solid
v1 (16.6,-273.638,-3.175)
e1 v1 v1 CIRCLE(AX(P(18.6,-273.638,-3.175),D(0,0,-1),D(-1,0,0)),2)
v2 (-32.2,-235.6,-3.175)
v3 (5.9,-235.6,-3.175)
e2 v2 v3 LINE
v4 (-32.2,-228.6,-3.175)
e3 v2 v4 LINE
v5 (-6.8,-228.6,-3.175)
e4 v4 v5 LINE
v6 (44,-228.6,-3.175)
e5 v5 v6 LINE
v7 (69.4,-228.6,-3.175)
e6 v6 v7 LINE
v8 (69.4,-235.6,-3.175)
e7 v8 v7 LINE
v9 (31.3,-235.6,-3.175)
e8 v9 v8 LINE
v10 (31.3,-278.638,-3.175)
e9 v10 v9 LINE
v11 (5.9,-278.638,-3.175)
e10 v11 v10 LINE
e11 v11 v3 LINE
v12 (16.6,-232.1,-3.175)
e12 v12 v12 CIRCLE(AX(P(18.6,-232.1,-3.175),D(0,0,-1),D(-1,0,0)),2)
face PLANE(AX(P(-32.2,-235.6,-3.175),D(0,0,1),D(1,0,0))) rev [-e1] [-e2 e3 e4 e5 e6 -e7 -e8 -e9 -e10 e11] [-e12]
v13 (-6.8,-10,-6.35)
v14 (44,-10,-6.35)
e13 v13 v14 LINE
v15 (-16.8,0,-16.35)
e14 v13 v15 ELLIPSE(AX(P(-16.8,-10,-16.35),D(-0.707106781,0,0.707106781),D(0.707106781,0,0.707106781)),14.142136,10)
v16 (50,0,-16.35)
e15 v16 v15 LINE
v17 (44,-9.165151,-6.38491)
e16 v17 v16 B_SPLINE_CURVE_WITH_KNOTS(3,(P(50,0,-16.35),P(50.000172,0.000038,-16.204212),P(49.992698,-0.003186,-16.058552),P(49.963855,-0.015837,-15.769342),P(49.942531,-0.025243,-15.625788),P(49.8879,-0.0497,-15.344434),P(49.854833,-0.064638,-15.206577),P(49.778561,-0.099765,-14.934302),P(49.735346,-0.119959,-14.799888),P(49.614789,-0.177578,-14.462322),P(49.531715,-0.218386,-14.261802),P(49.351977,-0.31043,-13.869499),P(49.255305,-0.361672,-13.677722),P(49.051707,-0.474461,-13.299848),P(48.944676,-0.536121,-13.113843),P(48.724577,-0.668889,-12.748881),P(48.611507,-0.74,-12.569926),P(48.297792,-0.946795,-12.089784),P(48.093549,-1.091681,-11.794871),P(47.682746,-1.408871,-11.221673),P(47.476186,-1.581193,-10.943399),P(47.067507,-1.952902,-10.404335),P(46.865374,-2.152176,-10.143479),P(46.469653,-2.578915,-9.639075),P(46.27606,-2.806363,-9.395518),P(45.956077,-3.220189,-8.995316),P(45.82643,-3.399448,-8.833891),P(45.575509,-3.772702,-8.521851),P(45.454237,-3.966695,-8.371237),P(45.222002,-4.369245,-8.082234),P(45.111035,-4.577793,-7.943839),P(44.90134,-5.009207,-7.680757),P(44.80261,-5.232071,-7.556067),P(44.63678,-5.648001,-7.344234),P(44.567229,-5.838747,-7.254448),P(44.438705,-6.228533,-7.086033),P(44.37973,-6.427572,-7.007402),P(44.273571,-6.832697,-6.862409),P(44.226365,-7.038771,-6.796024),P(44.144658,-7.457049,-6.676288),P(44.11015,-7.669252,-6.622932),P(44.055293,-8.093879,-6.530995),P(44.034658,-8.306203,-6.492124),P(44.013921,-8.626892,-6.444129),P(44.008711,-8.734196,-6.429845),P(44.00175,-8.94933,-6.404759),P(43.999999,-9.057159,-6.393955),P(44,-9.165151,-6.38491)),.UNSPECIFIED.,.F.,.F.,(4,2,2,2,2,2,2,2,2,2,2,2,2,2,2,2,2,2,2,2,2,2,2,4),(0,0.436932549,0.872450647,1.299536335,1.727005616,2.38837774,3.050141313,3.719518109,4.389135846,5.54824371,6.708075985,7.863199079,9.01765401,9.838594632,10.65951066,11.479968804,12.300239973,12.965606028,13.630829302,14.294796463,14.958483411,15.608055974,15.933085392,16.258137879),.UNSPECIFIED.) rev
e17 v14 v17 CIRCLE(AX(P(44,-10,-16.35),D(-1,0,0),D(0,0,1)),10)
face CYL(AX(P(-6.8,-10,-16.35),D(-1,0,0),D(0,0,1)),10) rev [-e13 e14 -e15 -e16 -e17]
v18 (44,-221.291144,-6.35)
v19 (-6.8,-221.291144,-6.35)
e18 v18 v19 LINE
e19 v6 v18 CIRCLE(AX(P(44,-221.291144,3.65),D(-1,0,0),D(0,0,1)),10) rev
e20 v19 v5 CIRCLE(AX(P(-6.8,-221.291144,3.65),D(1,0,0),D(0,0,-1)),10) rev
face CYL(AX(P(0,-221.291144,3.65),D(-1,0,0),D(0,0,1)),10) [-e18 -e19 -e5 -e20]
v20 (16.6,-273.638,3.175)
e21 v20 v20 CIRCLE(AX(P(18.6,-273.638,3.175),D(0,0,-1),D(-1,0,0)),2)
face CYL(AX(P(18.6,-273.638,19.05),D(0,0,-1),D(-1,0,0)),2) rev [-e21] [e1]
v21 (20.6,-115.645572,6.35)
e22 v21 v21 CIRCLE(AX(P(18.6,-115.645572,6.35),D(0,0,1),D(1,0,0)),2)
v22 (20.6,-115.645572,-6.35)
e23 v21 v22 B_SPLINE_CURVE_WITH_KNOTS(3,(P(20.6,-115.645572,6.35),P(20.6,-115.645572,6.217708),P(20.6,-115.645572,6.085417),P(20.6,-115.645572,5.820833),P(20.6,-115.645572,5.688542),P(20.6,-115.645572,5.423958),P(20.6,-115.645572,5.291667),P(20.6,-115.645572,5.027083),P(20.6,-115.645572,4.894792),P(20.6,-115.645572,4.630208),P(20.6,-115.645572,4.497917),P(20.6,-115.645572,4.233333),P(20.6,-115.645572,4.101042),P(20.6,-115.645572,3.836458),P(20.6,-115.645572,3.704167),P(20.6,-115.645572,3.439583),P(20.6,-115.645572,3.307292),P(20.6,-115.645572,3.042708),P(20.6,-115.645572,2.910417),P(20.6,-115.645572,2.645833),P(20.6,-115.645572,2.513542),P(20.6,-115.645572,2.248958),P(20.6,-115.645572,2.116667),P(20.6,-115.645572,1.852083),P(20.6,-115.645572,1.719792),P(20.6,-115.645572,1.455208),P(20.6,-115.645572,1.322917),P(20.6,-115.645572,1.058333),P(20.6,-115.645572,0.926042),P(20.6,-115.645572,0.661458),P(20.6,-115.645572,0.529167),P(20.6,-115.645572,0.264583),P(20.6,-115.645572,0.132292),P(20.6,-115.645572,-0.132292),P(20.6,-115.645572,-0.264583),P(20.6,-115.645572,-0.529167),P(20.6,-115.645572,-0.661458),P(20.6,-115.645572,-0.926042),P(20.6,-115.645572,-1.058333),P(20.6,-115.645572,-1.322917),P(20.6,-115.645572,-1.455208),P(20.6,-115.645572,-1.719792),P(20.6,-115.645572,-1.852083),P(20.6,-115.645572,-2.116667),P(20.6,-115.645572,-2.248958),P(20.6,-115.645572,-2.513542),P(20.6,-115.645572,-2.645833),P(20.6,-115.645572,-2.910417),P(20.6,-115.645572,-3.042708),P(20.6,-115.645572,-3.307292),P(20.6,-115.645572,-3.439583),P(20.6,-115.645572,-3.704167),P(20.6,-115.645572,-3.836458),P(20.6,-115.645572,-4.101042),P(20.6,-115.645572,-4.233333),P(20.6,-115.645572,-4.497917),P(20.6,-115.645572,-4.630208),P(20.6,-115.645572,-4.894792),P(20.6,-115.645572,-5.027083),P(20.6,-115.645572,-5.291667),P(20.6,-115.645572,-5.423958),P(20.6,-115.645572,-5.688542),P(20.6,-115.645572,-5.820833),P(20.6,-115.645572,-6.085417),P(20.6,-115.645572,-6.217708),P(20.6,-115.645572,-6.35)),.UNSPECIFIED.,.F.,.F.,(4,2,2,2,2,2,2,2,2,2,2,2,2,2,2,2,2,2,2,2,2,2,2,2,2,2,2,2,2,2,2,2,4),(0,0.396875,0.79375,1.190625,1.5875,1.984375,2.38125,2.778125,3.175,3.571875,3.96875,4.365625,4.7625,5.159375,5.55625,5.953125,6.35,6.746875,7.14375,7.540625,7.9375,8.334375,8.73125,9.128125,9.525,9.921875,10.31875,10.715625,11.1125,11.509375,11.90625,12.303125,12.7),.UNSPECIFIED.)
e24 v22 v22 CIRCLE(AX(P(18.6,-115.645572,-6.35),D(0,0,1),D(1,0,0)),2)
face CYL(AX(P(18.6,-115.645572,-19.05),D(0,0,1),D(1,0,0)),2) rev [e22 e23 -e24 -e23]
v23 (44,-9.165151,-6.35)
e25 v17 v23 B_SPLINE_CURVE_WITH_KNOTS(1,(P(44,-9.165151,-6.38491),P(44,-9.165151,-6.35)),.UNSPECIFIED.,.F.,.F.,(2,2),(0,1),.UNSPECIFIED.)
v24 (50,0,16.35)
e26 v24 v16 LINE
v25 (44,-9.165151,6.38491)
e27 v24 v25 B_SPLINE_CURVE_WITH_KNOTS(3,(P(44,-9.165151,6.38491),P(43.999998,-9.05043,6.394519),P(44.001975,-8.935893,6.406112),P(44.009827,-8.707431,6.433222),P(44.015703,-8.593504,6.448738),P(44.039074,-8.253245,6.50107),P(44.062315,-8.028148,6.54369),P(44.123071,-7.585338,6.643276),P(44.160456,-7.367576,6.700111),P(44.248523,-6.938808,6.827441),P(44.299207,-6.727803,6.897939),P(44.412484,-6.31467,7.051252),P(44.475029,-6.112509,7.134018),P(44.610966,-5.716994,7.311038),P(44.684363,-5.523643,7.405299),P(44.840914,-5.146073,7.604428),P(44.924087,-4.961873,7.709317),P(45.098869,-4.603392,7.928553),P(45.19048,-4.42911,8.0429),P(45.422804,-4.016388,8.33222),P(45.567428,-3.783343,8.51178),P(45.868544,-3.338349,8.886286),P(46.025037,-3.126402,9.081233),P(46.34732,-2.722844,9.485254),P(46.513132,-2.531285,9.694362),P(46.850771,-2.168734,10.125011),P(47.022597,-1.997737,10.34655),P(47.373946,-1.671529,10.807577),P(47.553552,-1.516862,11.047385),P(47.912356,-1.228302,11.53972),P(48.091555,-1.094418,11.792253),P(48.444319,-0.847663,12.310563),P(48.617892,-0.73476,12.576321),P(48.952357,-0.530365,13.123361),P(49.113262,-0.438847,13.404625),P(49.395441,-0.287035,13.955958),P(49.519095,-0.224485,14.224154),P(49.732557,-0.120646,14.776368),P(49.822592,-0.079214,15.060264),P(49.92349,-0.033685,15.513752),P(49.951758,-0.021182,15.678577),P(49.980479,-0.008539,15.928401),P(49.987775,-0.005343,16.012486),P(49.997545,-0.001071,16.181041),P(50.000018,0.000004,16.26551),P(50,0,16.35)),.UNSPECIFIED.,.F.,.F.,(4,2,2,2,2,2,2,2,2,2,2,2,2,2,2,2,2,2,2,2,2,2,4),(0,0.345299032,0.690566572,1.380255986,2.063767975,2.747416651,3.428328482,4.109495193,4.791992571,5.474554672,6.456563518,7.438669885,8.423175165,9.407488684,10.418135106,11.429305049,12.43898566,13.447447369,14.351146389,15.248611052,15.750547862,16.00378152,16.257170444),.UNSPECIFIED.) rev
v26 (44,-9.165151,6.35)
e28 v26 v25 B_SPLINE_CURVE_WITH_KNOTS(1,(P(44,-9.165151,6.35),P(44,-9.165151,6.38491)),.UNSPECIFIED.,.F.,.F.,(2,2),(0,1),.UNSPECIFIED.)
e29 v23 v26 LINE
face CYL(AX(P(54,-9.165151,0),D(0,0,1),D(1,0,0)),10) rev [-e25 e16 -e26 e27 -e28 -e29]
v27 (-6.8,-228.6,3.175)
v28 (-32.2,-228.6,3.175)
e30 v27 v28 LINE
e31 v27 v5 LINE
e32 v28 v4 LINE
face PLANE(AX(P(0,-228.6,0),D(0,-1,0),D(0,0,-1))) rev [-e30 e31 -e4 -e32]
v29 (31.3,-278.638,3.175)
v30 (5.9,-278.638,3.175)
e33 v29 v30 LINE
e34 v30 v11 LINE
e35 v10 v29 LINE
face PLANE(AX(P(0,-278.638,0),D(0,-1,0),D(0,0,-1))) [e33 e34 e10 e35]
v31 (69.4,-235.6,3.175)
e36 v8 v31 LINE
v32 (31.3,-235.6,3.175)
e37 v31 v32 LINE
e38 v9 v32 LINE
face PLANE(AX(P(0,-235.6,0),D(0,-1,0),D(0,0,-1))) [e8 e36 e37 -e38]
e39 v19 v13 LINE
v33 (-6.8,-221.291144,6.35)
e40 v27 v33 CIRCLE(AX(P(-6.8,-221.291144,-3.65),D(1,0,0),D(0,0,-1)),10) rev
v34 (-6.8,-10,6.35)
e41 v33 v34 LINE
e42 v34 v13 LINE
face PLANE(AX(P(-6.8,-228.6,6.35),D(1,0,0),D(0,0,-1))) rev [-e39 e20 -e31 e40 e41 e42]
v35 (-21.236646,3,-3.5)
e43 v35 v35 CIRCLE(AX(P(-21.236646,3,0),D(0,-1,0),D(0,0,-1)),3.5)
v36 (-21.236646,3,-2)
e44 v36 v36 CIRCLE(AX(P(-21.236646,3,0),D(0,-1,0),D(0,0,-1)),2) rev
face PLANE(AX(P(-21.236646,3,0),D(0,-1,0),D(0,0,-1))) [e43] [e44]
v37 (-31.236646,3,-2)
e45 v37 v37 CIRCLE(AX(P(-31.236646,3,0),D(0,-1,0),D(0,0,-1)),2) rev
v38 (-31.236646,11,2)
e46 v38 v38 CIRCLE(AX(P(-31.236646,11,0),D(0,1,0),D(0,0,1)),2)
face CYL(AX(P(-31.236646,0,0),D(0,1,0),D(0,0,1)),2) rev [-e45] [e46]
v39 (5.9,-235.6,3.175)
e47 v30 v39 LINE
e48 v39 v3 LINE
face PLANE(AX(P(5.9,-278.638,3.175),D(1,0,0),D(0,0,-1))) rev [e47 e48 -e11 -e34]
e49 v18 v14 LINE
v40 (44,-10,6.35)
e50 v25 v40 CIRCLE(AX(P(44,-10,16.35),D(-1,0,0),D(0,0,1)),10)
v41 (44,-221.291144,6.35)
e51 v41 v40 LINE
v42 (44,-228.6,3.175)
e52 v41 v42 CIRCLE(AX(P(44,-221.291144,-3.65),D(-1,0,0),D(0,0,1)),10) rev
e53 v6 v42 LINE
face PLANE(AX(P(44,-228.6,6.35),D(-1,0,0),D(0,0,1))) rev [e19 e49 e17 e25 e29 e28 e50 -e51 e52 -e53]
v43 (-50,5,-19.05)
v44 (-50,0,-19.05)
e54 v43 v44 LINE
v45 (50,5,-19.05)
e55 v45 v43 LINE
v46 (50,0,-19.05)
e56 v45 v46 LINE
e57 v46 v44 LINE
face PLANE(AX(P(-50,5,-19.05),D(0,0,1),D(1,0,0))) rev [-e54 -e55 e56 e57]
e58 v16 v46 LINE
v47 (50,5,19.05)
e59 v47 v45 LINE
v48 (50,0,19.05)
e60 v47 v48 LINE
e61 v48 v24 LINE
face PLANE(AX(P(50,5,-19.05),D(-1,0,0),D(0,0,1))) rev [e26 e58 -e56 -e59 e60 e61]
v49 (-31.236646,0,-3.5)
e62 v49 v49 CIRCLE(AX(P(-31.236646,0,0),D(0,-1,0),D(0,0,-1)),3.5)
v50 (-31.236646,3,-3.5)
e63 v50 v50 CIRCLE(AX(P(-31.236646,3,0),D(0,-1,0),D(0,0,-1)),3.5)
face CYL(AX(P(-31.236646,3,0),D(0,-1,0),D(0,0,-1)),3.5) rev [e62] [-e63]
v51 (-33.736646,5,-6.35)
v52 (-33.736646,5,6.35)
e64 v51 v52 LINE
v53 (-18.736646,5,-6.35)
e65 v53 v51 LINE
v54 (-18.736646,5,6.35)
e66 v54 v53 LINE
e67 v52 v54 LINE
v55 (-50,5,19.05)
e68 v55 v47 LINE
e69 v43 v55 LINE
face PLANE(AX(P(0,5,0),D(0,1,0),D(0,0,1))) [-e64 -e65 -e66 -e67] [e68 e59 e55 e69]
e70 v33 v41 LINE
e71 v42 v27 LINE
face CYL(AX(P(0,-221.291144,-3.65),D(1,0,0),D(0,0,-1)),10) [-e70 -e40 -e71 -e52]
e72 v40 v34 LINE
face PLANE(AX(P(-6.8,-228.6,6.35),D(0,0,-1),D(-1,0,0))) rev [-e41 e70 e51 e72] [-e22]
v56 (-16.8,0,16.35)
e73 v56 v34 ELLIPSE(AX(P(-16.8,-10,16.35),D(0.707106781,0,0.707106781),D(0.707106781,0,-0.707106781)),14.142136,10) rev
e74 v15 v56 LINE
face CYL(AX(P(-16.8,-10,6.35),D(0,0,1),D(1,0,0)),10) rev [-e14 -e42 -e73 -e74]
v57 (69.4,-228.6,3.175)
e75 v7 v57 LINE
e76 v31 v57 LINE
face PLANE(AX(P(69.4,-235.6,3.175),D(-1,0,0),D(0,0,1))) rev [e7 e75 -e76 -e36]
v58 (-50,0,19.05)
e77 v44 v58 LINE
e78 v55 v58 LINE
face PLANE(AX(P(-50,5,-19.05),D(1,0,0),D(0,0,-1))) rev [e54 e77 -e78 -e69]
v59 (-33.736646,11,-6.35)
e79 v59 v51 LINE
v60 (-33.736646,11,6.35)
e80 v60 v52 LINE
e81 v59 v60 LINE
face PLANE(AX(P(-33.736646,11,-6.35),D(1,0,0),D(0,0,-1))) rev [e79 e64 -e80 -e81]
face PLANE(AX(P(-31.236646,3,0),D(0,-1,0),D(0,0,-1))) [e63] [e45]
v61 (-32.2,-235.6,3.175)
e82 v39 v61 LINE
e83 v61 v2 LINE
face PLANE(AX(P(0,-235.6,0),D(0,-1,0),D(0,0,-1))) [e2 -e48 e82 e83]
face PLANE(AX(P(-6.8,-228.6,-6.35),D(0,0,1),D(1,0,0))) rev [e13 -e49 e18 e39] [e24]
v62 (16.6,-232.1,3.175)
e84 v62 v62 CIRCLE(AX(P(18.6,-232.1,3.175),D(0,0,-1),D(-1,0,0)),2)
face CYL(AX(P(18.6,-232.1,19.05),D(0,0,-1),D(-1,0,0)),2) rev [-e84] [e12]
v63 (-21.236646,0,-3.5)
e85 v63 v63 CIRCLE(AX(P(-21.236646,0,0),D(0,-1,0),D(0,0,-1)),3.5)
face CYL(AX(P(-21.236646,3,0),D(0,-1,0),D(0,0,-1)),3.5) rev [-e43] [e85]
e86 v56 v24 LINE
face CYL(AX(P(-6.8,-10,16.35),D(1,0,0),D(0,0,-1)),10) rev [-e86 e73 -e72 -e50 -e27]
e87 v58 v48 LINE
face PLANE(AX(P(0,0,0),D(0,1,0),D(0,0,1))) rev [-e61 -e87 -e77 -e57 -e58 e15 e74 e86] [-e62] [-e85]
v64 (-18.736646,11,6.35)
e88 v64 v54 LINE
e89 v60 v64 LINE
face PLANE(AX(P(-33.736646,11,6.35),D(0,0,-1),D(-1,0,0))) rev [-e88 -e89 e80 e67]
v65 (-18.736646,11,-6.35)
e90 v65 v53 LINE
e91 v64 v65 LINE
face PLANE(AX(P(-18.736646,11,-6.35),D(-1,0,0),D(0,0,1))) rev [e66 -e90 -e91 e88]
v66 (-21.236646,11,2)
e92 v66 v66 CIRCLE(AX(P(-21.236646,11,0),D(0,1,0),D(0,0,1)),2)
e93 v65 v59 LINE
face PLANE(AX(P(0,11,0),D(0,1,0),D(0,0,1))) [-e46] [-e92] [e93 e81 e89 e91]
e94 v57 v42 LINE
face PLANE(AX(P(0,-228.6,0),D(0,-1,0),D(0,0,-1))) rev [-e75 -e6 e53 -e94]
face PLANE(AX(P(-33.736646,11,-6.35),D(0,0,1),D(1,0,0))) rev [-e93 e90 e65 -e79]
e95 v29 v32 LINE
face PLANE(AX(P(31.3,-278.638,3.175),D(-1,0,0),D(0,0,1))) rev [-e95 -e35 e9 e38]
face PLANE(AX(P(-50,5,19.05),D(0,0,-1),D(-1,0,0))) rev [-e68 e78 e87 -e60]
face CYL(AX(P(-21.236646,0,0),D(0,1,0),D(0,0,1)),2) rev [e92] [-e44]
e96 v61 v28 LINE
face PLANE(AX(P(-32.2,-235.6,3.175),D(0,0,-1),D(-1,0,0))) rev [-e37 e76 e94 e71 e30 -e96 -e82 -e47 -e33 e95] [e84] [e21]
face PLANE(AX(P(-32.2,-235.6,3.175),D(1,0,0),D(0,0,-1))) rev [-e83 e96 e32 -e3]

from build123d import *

# Parameters (mm, degrees)
BOSS_EXTRUDE1_DEPTH         = 5
BOSS_EXTRUDE2_DEPTH         = 6
TAP_DRILL_FOR_M4X0_7_TAP1_D = 3.3
SKETCH3_R                   = 2.000000000000003
CUT_EXTRUDE1_DEPTH          = 55.62510869554404
SKETCH12_R                  = 3.5
CUT_EXTRUDE2_DEPTH          = 3
BOSS_EXTRUDE3_DEPTH         = 228.6
SKETCH14_W                  = 101.6
SKETCH14_H                  = 6.35
BOSS_EXTRUDE4_DEPTH         = 7
FILLET1_R                   = 10
FILLET2_R                   = 10
FILLET3_R                   = 10
SKETCH15_R                  = 2.0000000000000067
CUT_EXTRUDE3_DEPTH          = 247.61238943937914
SKETCH16_W                  = 25.4
SKETCH16_H                  = 6.35
BOSS_EXTRUDE5_DEPTH         = 43.038
SKETCH17_R                  = 2.0000000000000036
CUT_EXTRUDE4_DEPTH          = 289.00945413128363
SKETCH18_R                  = 2.0000000000000036
CUT_EXTRUDE5_DEPTH          = 289.2718422669824


with BuildPart() as part:
    # Sketch1 → Boss-Extrude1 (new body)
    with BuildSketch(Plane(origin=(0, 0, 0), x_dir=(1, 0, 0), z_dir=(0, 1, 0))):
        Polygon((-49.99999999999999, 19.050000000000004), (50.00000000000001, 19.050000000000004), (50.000000000000014, -19.049999999999997), (-49.99999999999999, -19.049999999999997), align=None)
    extrude(amount=BOSS_EXTRUDE1_DEPTH)

    # Sketch2 → Boss-Extrude2 (add)
    with BuildSketch(Plane(origin=(0, 5, 0), x_dir=(1, 0, 0), z_dir=(0, 1, 0))):
        Polygon((-33.73664574389268, 6.349999999999993), (-18.736645743892684, 6.349999999999995), (-18.73664574389268, -6.350000000000003), (-33.73664574389268, -6.350000000000006), align=None)
    extrude(amount=BOSS_EXTRUDE2_DEPTH)

    # Tap Drill for M4x0.7 Tap1 (through all)
    with Locations(Plane(origin=(0, 11, 0), x_dir=(1, 0, 0), z_dir=(0, 1, 0))):
        with Locations((-31.236645744, 0), (-21.236645744, 0)):
            Hole(TAP_DRILL_FOR_M4X0_7_TAP1_D / 2)

    # Sketch3 → Cut-Extrude1 (cut, through all)
    with BuildSketch(Plane(origin=(0, 11, 0), x_dir=(1, 0, 0), z_dir=(0, 1, 0))):
        with Locations(Location((-21.236645743892684, 0, 0), (0, 0, 270))):
            Circle(SKETCH3_R)
        with Locations(Location((-31.23664574389268, 0, 0), (0, 0, 270))):
            Circle(SKETCH3_R)
    extrude(amount=-CUT_EXTRUDE1_DEPTH, mode=Mode.SUBTRACT)

    # Sketch12 → Cut-Extrude2 (cut)
    with BuildSketch(Plane.XZ):
        with Locations(Location((-31.23664574389268, 0, 0), (0, 0, 270))):
            Circle(SKETCH12_R)
        with Locations(Location((-21.236645743892684, 0, 0), (0, 0, 270))):
            Circle(SKETCH12_R)
    extrude(amount=-CUT_EXTRUDE2_DEPTH, mode=Mode.SUBTRACT)

    # Sketch13 → Boss-Extrude3 (add)
    with BuildSketch(Plane.XZ):
        Polygon((-6.799999999999993, 6.349999999999998), (44.00000000000001, 6.349999999999998), (44.00000000000001, -6.350000000000001), (-6.799999999999991, -6.350000000000001), align=None)
    extrude(amount=BOSS_EXTRUDE3_DEPTH)

    # Sketch14 → Boss-Extrude4 (add)
    with BuildSketch(Plane.XZ.offset(228.6)):
        with Locations((18.60000000000002, 2.89e-15)):
            Rectangle(SKETCH14_W, SKETCH14_H)
    extrude(amount=BOSS_EXTRUDE4_DEPTH)

    # Fillet1
    # the kernel refuses this fillet: 10 mm, written as the material it takes off along each edge
    with BuildSketch(Plane(origin=(62.27213982406002, -228.6, -6.350000000000001), x_dir=(0, 1, 0), z_dir=(-1, 0, 0))) as fillet1_piece_1:
        with BuildLine():
            CenterArc((7.308855929624002, -10), FILLET1_R, 90, 46.9606878980301)
            Line((0, -3.1750000000000007), (-0.14617711859247606, -3.038500000000001))
            ThreePointArc((-0.14617711859247606, -3.038500000000001), (-0.19999999999998863, -1.5875000000000004), (-0.19999999999998863, 0))
            Line((-0.19999999999998863, 0), (0, 0.20000000000000018))
            Line((0, 0.20000000000000018), (7.308855929624002, 0.20000000000000018))
            Line((7.308855929624002, 0.20000000000000018), (7.308855929624002, 0))
        make_face()
    extrude(amount=87.34427964812001, mode=Mode.SUBTRACT)

    # Fillet2
    # the kernel refuses this fillet: 10 mm, written as the material it takes off along each edge
    with BuildSketch(Plane(origin=(-25.07213982406, -228.6, 6.349999999999998), x_dir=(0, 1, 0), z_dir=(1, 0, 0))) as fillet2_piece_1:
        with BuildLine():
            CenterArc((7.308855929624002, -10), FILLET2_R, 90, 46.9606878980301)
            Line((0, -3.1749999999999954), (-0.14617711859247606, -3.038499999999995))
            ThreePointArc((-0.14617711859247606, -3.038499999999995), (-0.19999999999998863, -1.5874999999999977), (-0.19999999999998863, 0))
            Line((-0.19999999999998863, 0), (0, 0.20000000000000018))
            Line((0, 0.20000000000000018), (7.308855929624002, 0.20000000000000018))
            Line((7.308855929624002, 0.20000000000000018), (7.308855929624002, 0))
        make_face()
    extrude(amount=87.34427964812001, mode=Mode.SUBTRACT)

    # Fillet3
    # the kernel refuses this fillet: 10 mm, written as the material it adds along each edge
    with BuildSketch(Plane(origin=(44.00000000000001, 0, 6.349999999999998), x_dir=(1, 0, 0), z_dir=(0, 0, -1))) as fillet3_piece_1:
        with BuildLine():
            CenterArc((10, 9.165151389911683), FILLET3_R, 180, 66.42182152179822)
            Line((0, 9.165151389911683), (-0.20000000000000284, 9.165151389911683))
            Line((-0.20000000000000284, 9.165151389911683), (-0.20000000000000284, 0))
            Line((-0.20000000000000284, 0), (0, -0.2))
            ThreePointArc((0, -0.2), (3.000000000000007, -0.2), (5.920000000000009, -0.18330302779823368))
            Line((5.920000000000009, -0.18330302779823368), (6.000000000000007, 0))
        make_face()
    extrude(amount=12.7)
    with BuildSketch(Plane(origin=(-6.799999999999993, 0, 6.349999999999998), x_dir=(0, 0, 1), z_dir=(1, 0, 0))) as fillet3_piece_2:
        with BuildLine():
            CenterArc((FILLET3_R, FILLET3_R), FILLET3_R, 180, 90)
            Line((-3.55e-15, FILLET3_R), (-FILLET3_R * 0.02, FILLET3_R))
            Line((-FILLET3_R * 0.02, FILLET3_R), (-FILLET3_R * 0.02, -FILLET3_R * 0.02))
            Line((-FILLET3_R * 0.02, -FILLET3_R * 0.02), (FILLET3_R, -FILLET3_R * 0.02))
            Line((FILLET3_R, -FILLET3_R * 0.02), (FILLET3_R, 0))
        make_face()
    extrude(amount=50.8)
    with BuildSketch(Plane(origin=(-6.799999999999991, 0, -6.350000000000001), x_dir=(-1, 0, -1.4e-16), z_dir=(-1.4e-16, 0, 1))) as fillet3_piece_3:
        with BuildLine():
            CenterArc((FILLET3_R, FILLET3_R), FILLET3_R, 180, 90)
            Line((-8.9e-16, FILLET3_R), (-FILLET3_R * 0.02, FILLET3_R))
            Line((-FILLET3_R * 0.02, FILLET3_R), (-FILLET3_R * 0.02, -FILLET3_R * 0.02))
            Line((-FILLET3_R * 0.02, -FILLET3_R * 0.02), (FILLET3_R, -FILLET3_R * 0.02))
            Line((FILLET3_R, -FILLET3_R * 0.02), (FILLET3_R, 0))
        make_face()
    extrude(amount=12.7)
    with BuildSketch(Plane(origin=(44.00000000000001, 0, -6.350000000000001), x_dir=(0, 0, -1), z_dir=(-1, 0, 0))) as fillet3_piece_4:
        with BuildLine():
            CenterArc((FILLET3_R, FILLET3_R), FILLET3_R, 180, 90)
            Line((0, FILLET3_R), (-FILLET3_R * 0.02, FILLET3_R))
            Line((-FILLET3_R * 0.02, FILLET3_R), (-FILLET3_R * 0.02, -FILLET3_R * 0.02))
            Line((-FILLET3_R * 0.02, -FILLET3_R * 0.02), (FILLET3_R, -FILLET3_R * 0.02))
            Line((FILLET3_R, -FILLET3_R * 0.02), (FILLET3_R, 0))
        make_face()
    extrude(amount=50.8)
    with BuildSketch(Plane(origin=(44.00000000000001, 0, 29.262878474779207), x_dir=(1, 0, 0), z_dir=(0, 0, -1))) as fillet3_piece_5a_section:
        with BuildLine():
            CenterArc((10, 9.165151389911683), FILLET3_R, 180, 66.42182152179822)
            Line((0, 9.165151389911683), (-0.20000000000000284, 9.165151389911683))
            Line((-0.20000000000000284, 9.165151389911683), (-0.20000000000000284, 0))
            Line((-0.20000000000000284, 0), (0, -0.2))
            ThreePointArc((0, -0.2), (3.000000000000007, -0.2), (5.920000000000009, -0.18330302779823368))
            Line((5.920000000000009, -0.18330302779823368), (6.000000000000007, 0))
        make_face()
    fillet3_piece_5a = extrude(amount=35.61287847477921, mode=Mode.PRIVATE)
    fillet3_piece_5a = split(fillet3_piece_5a, bisect_by=Plane(origin=(45.551632877410285, -2.2318754420498643, 19.049999999999997), z_dir=(0, 0, -1)), keep=Keep.TOP, mode=Mode.PRIVATE)
    fillet3_piece_5a = split(fillet3_piece_5a, bisect_by=Plane(origin=(45.551632877410285, -2.2318754420498643, 6.349999999999998), z_dir=(0, 0, 1)), keep=Keep.TOP, mode=Mode.PRIVATE)
    with BuildSketch(Plane(origin=(-6.799999999999993, 0, 6.349999999999998), x_dir=(0, 0, 1), z_dir=(1, 0, 0))) as fillet3_piece_5b_section:
        with BuildLine():
            CenterArc((FILLET3_R, FILLET3_R), FILLET3_R, 180, 90)
            Line((-3.55e-15, FILLET3_R), (-FILLET3_R * 0.02, FILLET3_R))
            Line((-FILLET3_R * 0.02, FILLET3_R), (-FILLET3_R * 0.02, -FILLET3_R * 0.02))
            Line((-FILLET3_R * 0.02, -FILLET3_R * 0.02), (FILLET3_R, -FILLET3_R * 0.02))
            Line((FILLET3_R, -FILLET3_R * 0.02), (FILLET3_R, 0))
        make_face()
    fillet3_piece_5b = extrude(amount=75.8, mode=Mode.PRIVATE)
    fillet3_piece_5b = split(fillet3_piece_5b, bisect_by=Plane(origin=(50.000000000000014, -2.2639511426682537, 8.613951142668249), z_dir=(-1, 0, 1.9e-16)), keep=Keep.TOP, mode=Mode.PRIVATE)
    fillet3_piece_5b = split(fillet3_piece_5b, bisect_by=Plane(origin=(44.00000000000001, -2.2639511426682537, 8.613951142668249), z_dir=(1, 0, 0)), keep=Keep.TOP, mode=Mode.PRIVATE)
    fillet3_piece_5 = fillet3_piece_5a & fillet3_piece_5b
    add(fillet3_piece_5)
    with BuildSketch(Plane(origin=(69, 0, -6.350000000000001), x_dir=(0, 0, -1), z_dir=(-1, 0, 0))) as fillet3_piece_6a_section:
        with BuildLine():
            CenterArc((FILLET3_R, FILLET3_R), FILLET3_R, 180, 90)
            Line((0, FILLET3_R), (-FILLET3_R * 0.02, FILLET3_R))
            Line((-FILLET3_R * 0.02, FILLET3_R), (-FILLET3_R * 0.02, -FILLET3_R * 0.02))
            Line((-FILLET3_R * 0.02, -FILLET3_R * 0.02), (FILLET3_R, -FILLET3_R * 0.02))
            Line((FILLET3_R, -FILLET3_R * 0.02), (FILLET3_R, 0))
        make_face()
    fillet3_piece_6a = extrude(amount=75.79999999999998, mode=Mode.PRIVATE)
    fillet3_piece_6a = split(fillet3_piece_6a, bisect_by=Plane(origin=(50.00000000000001, -2.2639511426682555, -8.613951142668254), z_dir=(-1, 0, 1.9e-16)), keep=Keep.TOP, mode=Mode.PRIVATE)
    fillet3_piece_6a = split(fillet3_piece_6a, bisect_by=Plane(origin=(44.00000000000001, -2.2639511426682555, -8.613951142668252), z_dir=(1, 0, 0)), keep=Keep.TOP, mode=Mode.PRIVATE)
    with BuildSketch(Plane(origin=(44.00000000000001, 0, 6.349999999999998), x_dir=(1, 0, 0), z_dir=(0, 0, -1))) as fillet3_piece_6b_section:
        with BuildLine():
            CenterArc((10, 9.165151389911683), FILLET3_R, 180, 66.42182152179822)
            Line((0, 9.165151389911683), (-0.20000000000000284, 9.165151389911683))
            Line((-0.20000000000000284, 9.165151389911683), (-0.20000000000000284, 0))
            Line((-0.20000000000000284, 0), (0, -0.2))
            ThreePointArc((0, -0.2), (3.000000000000007, -0.2), (5.920000000000009, -0.18330302779823368))
            Line((5.920000000000009, -0.18330302779823368), (6.000000000000007, 0))
        make_face()
    fillet3_piece_6b = extrude(amount=35.61287847477921, mode=Mode.PRIVATE)
    fillet3_piece_6b = split(fillet3_piece_6b, bisect_by=Plane(origin=(45.55163287741028, -2.2318754420498657, -19.050000000000004), z_dir=(0, 0, 1)), keep=Keep.TOP, mode=Mode.PRIVATE)
    fillet3_piece_6b = split(fillet3_piece_6b, bisect_by=Plane(origin=(45.551632877410285, -2.2318754420498657, -6.350000000000001), z_dir=(0, 0, -1)), keep=Keep.TOP, mode=Mode.PRIVATE)
    fillet3_piece_6 = fillet3_piece_6a & fillet3_piece_6b
    add(fillet3_piece_6)
    with BuildSketch(Plane(origin=(-6.799999999999991, 0, -6.350000000000001), x_dir=(-1, 0, -1.4e-16), z_dir=(-1.4e-16, 0, 1))) as fillet3_piece_7a_section:
        with BuildLine():
            CenterArc((FILLET3_R, FILLET3_R), FILLET3_R, 180, 90)
            Line((-8.9e-16, FILLET3_R), (-FILLET3_R * 0.02, FILLET3_R))
            Line((-FILLET3_R * 0.02, FILLET3_R), (-FILLET3_R * 0.02, -FILLET3_R * 0.02))
            Line((-FILLET3_R * 0.02, -FILLET3_R * 0.02), (FILLET3_R, -FILLET3_R * 0.02))
            Line((FILLET3_R, -FILLET3_R * 0.02), (FILLET3_R, 0))
        make_face()
    fillet3_piece_7a = extrude(amount=37.699999999999996, mode=Mode.PRIVATE)
    fillet3_piece_7a = split(fillet3_piece_7a, bisect_by=Plane(origin=(-9.063951142668245, -2.2639511426682555, 19.049999999999997), z_dir=(0, 0, -1)), keep=Keep.TOP, mode=Mode.PRIVATE)
    fillet3_piece_7a = split(fillet3_piece_7a, bisect_by=Plane(origin=(-9.063951142668246, -2.2639511426682555, 6.349999999999998), z_dir=(0, 0, 1)), keep=Keep.TOP, mode=Mode.PRIVATE)
    with BuildSketch(Plane(origin=(-31.79999999999999, 0, 6.349999999999998), x_dir=(0, 0, 1), z_dir=(1, 0, 0))) as fillet3_piece_7b_section:
        with BuildLine():
            CenterArc((FILLET3_R, FILLET3_R), FILLET3_R, 180, 90)
            Line((-3.55e-15, FILLET3_R), (-FILLET3_R * 0.02, FILLET3_R))
            Line((-FILLET3_R * 0.02, FILLET3_R), (-FILLET3_R * 0.02, -FILLET3_R * 0.02))
            Line((-FILLET3_R * 0.02, -FILLET3_R * 0.02), (FILLET3_R, -FILLET3_R * 0.02))
            Line((FILLET3_R, -FILLET3_R * 0.02), (FILLET3_R, 0))
        make_face()
    fillet3_piece_7b = extrude(amount=75.8, mode=Mode.PRIVATE)
    fillet3_piece_7b = split(fillet3_piece_7b, bisect_by=Plane(origin=(-6.799999999999993, -2.263951142668253, 8.613951142668249), z_dir=(-1, 0, -1.4e-16)), keep=Keep.TOP, mode=Mode.PRIVATE)
    fillet3_piece_7 = fillet3_piece_7a & fillet3_piece_7b
    add(fillet3_piece_7)
    with BuildSketch(Plane(origin=(-6.799999999999987, 0, -31.349999999999998), x_dir=(-1, 0, -1.4e-16), z_dir=(-1.4e-16, 0, 1))) as fillet3_piece_8a_section:
        with BuildLine():
            CenterArc((FILLET3_R, FILLET3_R), FILLET3_R, 180, 90)
            Line((-8.9e-16, FILLET3_R), (-FILLET3_R * 0.02, FILLET3_R))
            Line((-FILLET3_R * 0.02, FILLET3_R), (-FILLET3_R * 0.02, -FILLET3_R * 0.02))
            Line((-FILLET3_R * 0.02, -FILLET3_R * 0.02), (FILLET3_R, -FILLET3_R * 0.02))
            Line((FILLET3_R, -FILLET3_R * 0.02), (FILLET3_R, 0))
        make_face()
    fillet3_piece_8a = extrude(amount=37.699999999999996, mode=Mode.PRIVATE)
    fillet3_piece_8a = split(fillet3_piece_8a, bisect_by=Plane(origin=(-9.063951142668245, -2.2639511426682524, -19.050000000000004), z_dir=(0, 0, 1)), keep=Keep.TOP, mode=Mode.PRIVATE)
    fillet3_piece_8a = split(fillet3_piece_8a, bisect_by=Plane(origin=(-9.063951142668245, -2.2639511426682524, -6.350000000000001), z_dir=(0, 0, -1)), keep=Keep.TOP, mode=Mode.PRIVATE)
    with BuildSketch(Plane(origin=(44.00000000000001, 0, -6.350000000000001), x_dir=(0, 0, -1), z_dir=(-1, 0, 0))) as fillet3_piece_8b_section:
        with BuildLine():
            CenterArc((FILLET3_R, FILLET3_R), FILLET3_R, 180, 90)
            Line((0, FILLET3_R), (-FILLET3_R * 0.02, FILLET3_R))
            Line((-FILLET3_R * 0.02, FILLET3_R), (-FILLET3_R * 0.02, -FILLET3_R * 0.02))
            Line((-FILLET3_R * 0.02, -FILLET3_R * 0.02), (FILLET3_R, -FILLET3_R * 0.02))
            Line((FILLET3_R, -FILLET3_R * 0.02), (FILLET3_R, 0))
        make_face()
    fillet3_piece_8b = extrude(amount=75.8, mode=Mode.PRIVATE)
    fillet3_piece_8b = split(fillet3_piece_8b, bisect_by=Plane(origin=(-6.799999999999991, -2.263951142668254, -8.613951142668252), z_dir=(-1, 0, -1.4e-16)), keep=Keep.TOP, mode=Mode.PRIVATE)
    fillet3_piece_8 = fillet3_piece_8a & fillet3_piece_8b
    add(fillet3_piece_8)

    # Sketch15 → Cut-Extrude3 (cut, through all)
    with BuildSketch(Plane(origin=(0, 0, -3.174999999999997), x_dir=(-1, 0, 0), z_dir=(0, 0, -1))):
        with Locations((-18.600000000000023, -232.09999999999997)):
            Circle(SKETCH15_R)
    extrude(amount=-CUT_EXTRUDE3_DEPTH, mode=Mode.SUBTRACT)

    # Sketch16 → Boss-Extrude5 (add)
    with BuildSketch(Plane.XZ.offset(235.6)):
        with Locations((18.6, 2.89e-15)):
            Rectangle(SKETCH16_W, SKETCH16_H)
    extrude(amount=BOSS_EXTRUDE5_DEPTH)

    # Sketch17 → Cut-Extrude4 (cut, through all)
    with BuildSketch(Plane(origin=(0, 0, -3.174999999999997), x_dir=(-1, 0, 0), z_dir=(0, 0, -1))):
        with Locations((-18.599999999999998, -273.638)):
            Circle(SKETCH17_R)
    extrude(amount=-CUT_EXTRUDE4_DEPTH, mode=Mode.SUBTRACT)

    # Sketch18 → Cut-Extrude5 (cut, through all)
    with BuildSketch(Plane.XY.offset(6.349999999999998)):
        with Locations((18.599999999999984, -115.64557203518808)):
            Circle(SKETCH18_R)
    extrude(amount=-CUT_EXTRUDE5_DEPTH, mode=Mode.SUBTRACT)


solid = part.part
